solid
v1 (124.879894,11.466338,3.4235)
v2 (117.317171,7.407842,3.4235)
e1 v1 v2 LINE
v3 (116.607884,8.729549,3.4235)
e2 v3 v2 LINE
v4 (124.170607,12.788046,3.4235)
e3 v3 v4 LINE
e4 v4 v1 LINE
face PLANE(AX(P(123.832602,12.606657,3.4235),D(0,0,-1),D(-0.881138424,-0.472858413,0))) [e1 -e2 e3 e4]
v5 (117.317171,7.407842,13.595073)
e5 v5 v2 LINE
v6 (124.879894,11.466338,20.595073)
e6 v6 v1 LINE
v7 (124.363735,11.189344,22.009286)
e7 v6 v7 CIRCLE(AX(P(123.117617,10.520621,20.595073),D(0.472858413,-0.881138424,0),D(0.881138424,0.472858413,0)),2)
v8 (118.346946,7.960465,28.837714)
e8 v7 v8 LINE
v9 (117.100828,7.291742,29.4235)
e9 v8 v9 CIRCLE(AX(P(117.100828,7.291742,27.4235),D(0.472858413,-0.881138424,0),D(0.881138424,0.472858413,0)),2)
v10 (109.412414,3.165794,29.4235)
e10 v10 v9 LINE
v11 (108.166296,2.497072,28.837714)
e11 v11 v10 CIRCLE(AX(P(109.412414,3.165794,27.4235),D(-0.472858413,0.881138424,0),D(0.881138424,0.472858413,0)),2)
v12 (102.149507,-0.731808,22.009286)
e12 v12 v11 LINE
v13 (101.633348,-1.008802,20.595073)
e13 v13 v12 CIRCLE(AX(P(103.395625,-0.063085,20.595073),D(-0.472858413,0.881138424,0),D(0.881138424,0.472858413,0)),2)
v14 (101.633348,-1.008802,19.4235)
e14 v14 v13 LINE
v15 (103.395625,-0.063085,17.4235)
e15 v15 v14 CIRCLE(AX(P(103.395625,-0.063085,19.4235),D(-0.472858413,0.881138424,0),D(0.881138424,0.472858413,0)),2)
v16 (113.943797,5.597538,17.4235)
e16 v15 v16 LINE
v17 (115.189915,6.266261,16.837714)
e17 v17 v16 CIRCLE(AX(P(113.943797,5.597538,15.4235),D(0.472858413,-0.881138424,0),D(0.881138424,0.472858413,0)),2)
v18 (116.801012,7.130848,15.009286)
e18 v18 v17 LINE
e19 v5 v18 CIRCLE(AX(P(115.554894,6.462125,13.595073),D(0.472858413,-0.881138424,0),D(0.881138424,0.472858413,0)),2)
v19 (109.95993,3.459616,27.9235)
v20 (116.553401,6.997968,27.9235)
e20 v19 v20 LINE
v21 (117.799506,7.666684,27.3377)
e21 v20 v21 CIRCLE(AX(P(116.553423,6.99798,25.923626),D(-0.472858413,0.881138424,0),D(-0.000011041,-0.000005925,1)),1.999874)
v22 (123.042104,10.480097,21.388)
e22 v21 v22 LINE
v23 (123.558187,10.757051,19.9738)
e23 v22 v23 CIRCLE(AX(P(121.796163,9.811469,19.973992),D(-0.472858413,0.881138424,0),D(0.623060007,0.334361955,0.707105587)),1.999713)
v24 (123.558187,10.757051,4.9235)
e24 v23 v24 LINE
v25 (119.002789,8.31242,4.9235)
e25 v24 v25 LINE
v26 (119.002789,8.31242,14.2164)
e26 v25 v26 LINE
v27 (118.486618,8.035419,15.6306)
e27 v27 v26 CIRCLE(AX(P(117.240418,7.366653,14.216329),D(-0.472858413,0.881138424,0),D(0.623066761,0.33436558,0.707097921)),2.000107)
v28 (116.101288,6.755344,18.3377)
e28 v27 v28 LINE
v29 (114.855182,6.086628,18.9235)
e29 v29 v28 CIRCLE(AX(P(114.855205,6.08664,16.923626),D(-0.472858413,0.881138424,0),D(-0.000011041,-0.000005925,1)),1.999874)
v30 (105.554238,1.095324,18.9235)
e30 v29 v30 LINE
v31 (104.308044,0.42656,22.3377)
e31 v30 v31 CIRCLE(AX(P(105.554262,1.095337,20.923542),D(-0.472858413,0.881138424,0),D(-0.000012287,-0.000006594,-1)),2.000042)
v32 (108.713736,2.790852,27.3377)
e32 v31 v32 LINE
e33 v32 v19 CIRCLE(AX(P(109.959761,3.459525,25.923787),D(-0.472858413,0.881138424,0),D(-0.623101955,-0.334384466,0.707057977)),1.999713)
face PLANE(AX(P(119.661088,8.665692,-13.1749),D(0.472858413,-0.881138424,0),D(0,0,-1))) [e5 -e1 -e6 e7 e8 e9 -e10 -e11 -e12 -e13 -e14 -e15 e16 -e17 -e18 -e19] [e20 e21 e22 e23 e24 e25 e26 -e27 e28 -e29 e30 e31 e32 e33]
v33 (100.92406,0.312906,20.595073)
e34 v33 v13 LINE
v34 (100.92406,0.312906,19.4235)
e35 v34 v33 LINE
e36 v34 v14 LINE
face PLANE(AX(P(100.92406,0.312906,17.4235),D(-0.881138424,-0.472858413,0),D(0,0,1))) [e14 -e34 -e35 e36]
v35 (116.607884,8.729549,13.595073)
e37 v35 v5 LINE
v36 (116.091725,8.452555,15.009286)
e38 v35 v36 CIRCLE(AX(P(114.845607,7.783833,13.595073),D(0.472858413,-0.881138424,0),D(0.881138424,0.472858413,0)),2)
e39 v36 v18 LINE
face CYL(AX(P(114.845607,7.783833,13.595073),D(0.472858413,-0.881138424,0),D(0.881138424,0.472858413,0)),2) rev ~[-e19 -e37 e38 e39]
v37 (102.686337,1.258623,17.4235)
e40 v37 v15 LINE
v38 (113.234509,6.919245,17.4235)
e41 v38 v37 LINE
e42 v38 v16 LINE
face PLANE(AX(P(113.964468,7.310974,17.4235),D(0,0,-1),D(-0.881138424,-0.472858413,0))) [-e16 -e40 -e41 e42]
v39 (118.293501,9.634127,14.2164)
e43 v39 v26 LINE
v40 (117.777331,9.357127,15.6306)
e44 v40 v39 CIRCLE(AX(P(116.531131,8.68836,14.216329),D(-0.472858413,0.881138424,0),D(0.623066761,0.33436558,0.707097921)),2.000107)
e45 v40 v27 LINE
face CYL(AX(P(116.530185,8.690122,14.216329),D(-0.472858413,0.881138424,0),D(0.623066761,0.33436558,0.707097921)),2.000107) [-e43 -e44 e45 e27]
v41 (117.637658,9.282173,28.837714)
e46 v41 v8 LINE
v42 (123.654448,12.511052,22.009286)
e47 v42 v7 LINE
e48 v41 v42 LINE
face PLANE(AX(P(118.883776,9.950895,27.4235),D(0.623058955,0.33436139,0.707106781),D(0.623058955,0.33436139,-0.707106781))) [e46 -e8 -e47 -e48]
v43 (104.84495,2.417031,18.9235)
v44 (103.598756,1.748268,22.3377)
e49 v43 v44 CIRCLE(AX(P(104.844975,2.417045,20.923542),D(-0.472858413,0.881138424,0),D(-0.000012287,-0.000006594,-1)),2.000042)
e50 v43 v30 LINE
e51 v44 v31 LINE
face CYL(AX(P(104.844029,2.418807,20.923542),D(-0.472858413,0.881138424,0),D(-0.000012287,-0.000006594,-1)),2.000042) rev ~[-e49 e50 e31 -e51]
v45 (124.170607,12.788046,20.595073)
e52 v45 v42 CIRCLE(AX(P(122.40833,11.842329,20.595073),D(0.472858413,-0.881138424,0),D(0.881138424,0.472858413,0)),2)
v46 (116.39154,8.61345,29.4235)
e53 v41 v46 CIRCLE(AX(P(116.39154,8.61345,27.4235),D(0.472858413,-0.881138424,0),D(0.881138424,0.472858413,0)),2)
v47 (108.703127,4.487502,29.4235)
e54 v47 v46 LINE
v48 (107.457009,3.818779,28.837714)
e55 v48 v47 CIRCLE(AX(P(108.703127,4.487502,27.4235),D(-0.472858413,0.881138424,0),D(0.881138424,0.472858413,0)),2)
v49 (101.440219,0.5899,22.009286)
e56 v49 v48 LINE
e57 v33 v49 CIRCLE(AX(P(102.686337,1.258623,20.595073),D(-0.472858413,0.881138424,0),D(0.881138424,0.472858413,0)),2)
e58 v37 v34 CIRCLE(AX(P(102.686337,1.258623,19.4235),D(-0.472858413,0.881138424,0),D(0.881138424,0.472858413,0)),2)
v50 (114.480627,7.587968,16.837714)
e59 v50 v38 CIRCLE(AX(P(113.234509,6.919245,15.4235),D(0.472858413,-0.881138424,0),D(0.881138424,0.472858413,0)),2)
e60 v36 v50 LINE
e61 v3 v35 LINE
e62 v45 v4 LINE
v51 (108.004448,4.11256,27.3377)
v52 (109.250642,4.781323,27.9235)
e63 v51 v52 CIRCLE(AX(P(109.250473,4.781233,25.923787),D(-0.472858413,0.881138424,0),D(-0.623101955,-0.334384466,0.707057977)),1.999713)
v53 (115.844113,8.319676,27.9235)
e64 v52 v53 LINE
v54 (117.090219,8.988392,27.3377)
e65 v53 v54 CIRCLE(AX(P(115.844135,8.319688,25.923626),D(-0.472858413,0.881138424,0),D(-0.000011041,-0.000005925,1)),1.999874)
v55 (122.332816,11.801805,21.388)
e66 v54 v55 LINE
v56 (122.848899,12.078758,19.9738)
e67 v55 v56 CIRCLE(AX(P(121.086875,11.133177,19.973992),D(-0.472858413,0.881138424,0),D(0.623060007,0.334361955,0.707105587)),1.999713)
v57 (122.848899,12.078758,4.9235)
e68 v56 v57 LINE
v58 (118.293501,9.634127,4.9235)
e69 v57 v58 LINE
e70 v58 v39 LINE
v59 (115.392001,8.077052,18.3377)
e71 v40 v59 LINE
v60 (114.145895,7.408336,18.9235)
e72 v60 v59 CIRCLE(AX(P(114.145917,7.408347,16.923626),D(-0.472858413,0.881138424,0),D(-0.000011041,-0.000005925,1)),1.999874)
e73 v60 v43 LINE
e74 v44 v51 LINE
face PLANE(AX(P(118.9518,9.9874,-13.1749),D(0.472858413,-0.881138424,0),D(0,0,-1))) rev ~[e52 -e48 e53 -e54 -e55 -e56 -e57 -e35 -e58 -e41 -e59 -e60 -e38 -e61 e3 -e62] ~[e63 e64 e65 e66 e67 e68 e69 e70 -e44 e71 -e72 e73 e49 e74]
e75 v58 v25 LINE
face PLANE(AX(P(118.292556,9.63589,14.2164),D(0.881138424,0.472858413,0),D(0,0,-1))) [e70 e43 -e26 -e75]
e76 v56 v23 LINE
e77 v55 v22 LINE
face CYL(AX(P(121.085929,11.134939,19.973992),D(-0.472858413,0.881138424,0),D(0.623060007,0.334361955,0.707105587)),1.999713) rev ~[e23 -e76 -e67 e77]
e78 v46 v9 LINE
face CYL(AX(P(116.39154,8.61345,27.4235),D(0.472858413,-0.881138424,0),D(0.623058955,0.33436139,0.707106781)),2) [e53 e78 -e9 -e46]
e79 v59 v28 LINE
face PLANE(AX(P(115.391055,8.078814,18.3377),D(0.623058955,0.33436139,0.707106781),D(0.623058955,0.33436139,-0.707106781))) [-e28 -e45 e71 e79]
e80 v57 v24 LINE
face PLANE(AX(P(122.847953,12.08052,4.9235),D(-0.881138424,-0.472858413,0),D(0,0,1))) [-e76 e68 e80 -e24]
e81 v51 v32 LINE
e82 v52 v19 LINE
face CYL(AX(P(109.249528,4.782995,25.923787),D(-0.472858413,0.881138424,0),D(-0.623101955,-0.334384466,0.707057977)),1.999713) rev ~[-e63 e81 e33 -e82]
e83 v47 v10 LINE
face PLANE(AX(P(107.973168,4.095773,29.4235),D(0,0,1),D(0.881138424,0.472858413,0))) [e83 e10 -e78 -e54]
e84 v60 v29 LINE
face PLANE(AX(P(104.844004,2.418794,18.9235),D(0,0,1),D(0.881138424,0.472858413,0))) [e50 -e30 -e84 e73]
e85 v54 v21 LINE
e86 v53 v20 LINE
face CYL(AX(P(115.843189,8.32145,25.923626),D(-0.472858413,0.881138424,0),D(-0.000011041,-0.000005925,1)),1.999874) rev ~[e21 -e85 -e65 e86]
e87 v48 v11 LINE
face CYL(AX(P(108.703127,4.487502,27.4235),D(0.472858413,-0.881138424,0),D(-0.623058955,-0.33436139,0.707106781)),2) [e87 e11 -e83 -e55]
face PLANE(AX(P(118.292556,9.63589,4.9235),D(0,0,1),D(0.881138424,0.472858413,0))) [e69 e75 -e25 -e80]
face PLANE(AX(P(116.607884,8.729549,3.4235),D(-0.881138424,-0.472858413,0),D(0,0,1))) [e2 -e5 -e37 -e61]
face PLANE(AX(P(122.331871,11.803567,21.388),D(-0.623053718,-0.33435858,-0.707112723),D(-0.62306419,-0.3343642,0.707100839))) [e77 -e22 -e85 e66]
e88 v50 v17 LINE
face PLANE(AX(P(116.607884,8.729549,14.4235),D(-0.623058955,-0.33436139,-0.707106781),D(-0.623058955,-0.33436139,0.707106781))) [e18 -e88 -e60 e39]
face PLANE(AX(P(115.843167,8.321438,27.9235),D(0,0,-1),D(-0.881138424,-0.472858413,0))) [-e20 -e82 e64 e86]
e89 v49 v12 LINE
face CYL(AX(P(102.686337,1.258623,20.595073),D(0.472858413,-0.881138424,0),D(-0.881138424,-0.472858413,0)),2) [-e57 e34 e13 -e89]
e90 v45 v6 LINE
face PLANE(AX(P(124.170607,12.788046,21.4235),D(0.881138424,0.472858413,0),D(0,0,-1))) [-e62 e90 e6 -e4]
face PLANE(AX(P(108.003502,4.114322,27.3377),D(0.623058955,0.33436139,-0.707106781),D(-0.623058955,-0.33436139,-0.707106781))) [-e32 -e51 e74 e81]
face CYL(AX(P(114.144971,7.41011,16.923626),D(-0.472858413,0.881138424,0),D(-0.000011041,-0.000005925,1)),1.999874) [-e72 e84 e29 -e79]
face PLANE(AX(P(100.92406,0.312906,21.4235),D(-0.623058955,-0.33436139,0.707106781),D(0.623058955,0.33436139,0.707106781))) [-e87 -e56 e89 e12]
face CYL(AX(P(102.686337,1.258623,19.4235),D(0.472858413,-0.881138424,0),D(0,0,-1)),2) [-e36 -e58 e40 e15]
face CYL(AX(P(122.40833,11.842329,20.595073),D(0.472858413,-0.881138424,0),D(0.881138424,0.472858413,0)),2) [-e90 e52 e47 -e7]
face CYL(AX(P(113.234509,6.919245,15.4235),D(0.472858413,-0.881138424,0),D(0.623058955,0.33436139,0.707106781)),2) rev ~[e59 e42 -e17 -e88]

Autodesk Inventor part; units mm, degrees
ref_plane "YZ Plane" through (0, 0, 0) normal (1, 0, 0) x (0, 1, 0)
ref_plane "XZ Plane" through (0, 0, 0) normal (0, 1, 0) x (-1, 0, 0)
ref_plane "XY Plane" through (0, 0, 0) normal (0, 0, 1) x (1, 0, 0)
ref_plane "Work Plane1" through (118.9518, 9.9874, -13.1749) normal (0.4728584, -0.8811384, 0) x (0, 0, -1)
sketch "Sketch1" plane through (118.9518, 9.9874, -13.1749) normal (0.4728584, -0.8811384, 0) x (0, 0, -1)
  line L0 (-16.5984, 5.5392) -> (-16.5984, 5.9228)
  line L1 (-1.2281, -14.4596) -> (-31.7652, -14.4596) construction
  line L2 (-16.5984, 11.5008) -> (-16.5984, -0.9971) projected
  line L3 (-15.5984, -2) -> (-12.5984, -2)
  line L4 (-16.5984, 2) -> (-12.5984, 2)
  line L5 (-16.5984, -2.6601) -> (-27.5984, -2.6601)
  line L6 (-27.5984, -2.6601) -> (-30.5984, -5.6601)
  line L7 (-30.5984, -5.6601) -> (-30.5984, -8.4596)
  line L8 (-30.5984, -8.4596) -> (-30.5984, -20.4596)
  line L9 (-30.5984, -20.4596) -> (-34.5984, -20.4596)
  line L10 (-34.5984, -20.4596) -> (-42.5984, -12.4596)
  line L11 (-42.5984, -12.4596) -> (-42.5984, -2.0772)
  line L12 (-42.5984, -2.0772) -> (-34.5984, 5.9228)
  line L13 (-34.5984, 5.9228) -> (-16.5984, 5.9228)
  line L14 (-16.5984, 0.8574) -> (-16.5984, 5.9228)
  line L15 (-16.5984, 3.3399) -> (-48.439, 3.3399) construction
  line L16 (-16.5984, -0.9971) -> (-16.5984, -2.6601)
  line L17 (-16.5984, -0.0772) -> (-40.5984, -0.0772) construction
  line L18 (-40.5984, -0.0772) -> (-40.5984, -14.4596) construction
  line L19 (-16.5984, -0.0772) -> (-40.5984, -0.0772)
  line L20 (-19.5984, -2.6601) -> (-17.0984, -2.6601) projected
  point P0 (-13.1749, -109.5356)
  point P1 (-16.5984, 0.8574)
  dimension "d25" = 135
  dimension "d26" = 4
  dimension "d27" = 6
  dimension "d28" = 2.5829
  dimension "d29" = 6
  dimension "d31" = 12
  dimension "d40" = 3
  dimension "d42" = 26
  dimension "d45" = 0
  dimension "d50" = 8
  dimension "d62" = 0
extrude "Extrusion1" add sketch "Sketch1" along normal blind 1.5
sketch "Sketch2" plane through (119.6611, 8.6657, -13.1749) normal (0.4728584, -0.8811384, 0) x (0.8811384, 0.4728584, 0)
  line L0 (-2.0772, 42.5984) -> (-12.4596, 42.5984) projected
  line L1 (-12.4596, 42.5984) -> (-20.4596, 34.5984) projected
  line L2 (-20.4596, 34.5984) -> (-20.4596, 30.5984) projected
  line L3 (-20.4596, 30.5984) -> (-5.6601, 30.5984) projected
  line L4 (-5.6601, 30.5984) -> (-2.6601, 27.5984) projected
  line L5 (-2.6601, 27.5984) -> (-2.6601, 16.5984) projected
  line L6 (5.9228, 16.5984) -> (5.9228, 34.5984) projected
  line L7 (5.9228, 34.5984) -> (-2.0772, 42.5984) projected
  line L8 (-2.6601, 16.5984) -> (5.9228, 16.5984) projected
  line L9 (-11.8383, 41.0984) -> (-2.6985, 41.0984)
  line L10 (-2.6985, 41.0984) -> (4.4228, 33.9771)
  line L11 (4.4228, 33.9771) -> (4.4228, 18.0984)
  line L12 (4.4228, 18.0984) -> (-0.9902, 18.0984)
  line L13 (-0.9902, 18.0984) -> (-1.1601, 18.0962)
  line L14 (-1.1601, 18.0962) -> (-1.1601, 28.2197)
  line L15 (-1.1601, 28.2197) -> (-5.0388, 32.0984)
  line L16 (-5.0388, 32.0984) -> (-8.9884, 32.0984)
  line L17 (-8.9884, 32.0984) -> (-9.9596, 32.0984)
  line L18 (-9.9596, 32.0984) -> (-18.9596, 32.0984)
  line L19 (-18.9596, 32.0984) -> (-18.9596, 33.9771)
  line L20 (-18.9596, 33.9771) -> (-11.8383, 41.0984)
  point P0 (-109.5356, 13.1749)
  point P1 (-0.7471, 18.0984)
  dimension "d41" = 1.5
  dimension "d63" = 1.5
extrude "Extrusion2" [suppressed]
sketch "Sketch3" plane through (103.5006, 1.6956, 17.4235) normal (0, 0, -1) x (-0.8811384, -0.4728584, 0)
  circle A0 centre (-2.8052, -7.75) radius 4.5
  line L0 (3.1948, 0) -> (-8.8052, 0) projected
  line L1 (-8.8052, 0) -> (-8.8052, -15.5) projected
  line L2 (3.1948, -15.5) -> (-8.8052, -15.5) projected
  line L3 (3.1948, 0) -> (3.1948, -15.5) projected
  point P0 (92.0001, 47.4471)
extrude "Extrusion3" cut sketch "Sketch3" against normal blind 1.5 contours A0
sketch "Sketch8" plane through (119.7213, 8.698, 3.4235) normal (0, 0, 1) x (0.8811384, 0.4728584, 0)
  circle A0 centre (-19.1075, 3.6497) radius 1.4001 projected
  circle A1 centre (-14.1578, 7.8923) radius 2 projected
  circle A2 centre (-14.1578, 7.8923) radius 3.3708
  point P0 (-109.604, 48.9471)
extrude "Extrusion8" cut sketch "Sketch8" along normal mid plane 14 contours A1 | A2
sketch "Sketch9" plane through (118.7885, 8.1974, 4.9235) normal (0, 0, 1) x (0.8811384, 0.4728584, 0)
  circle A0 centre (0.9902, -6.25) radius 1.352 projected
  circle A1 centre (0.9902, -6.25) radius 2.6601
  point P0 (-108.5454, 48.9471)
extrude "Extrusion9" [suppressed]
ref_plane "Arbeitsebene3" through (124.1706, 12.788, 7.4235) normal (0, 0, -1) x (-0.8811384, -0.4728584, 0)
sketch "Skizze13" plane through (124.1706, 12.788, 7.4235) normal (0, 0, -1) x (-0.8811384, -0.4728584, 0)
  line L0 (0, 0) -> (0, -1.5) projected
  circle A0 centre (-2.8278, -9.3645) radius 1.1933 projected
  line L1 (8.5829, 0) -> (0, 0) projected
  line L2 (0, 0) -> (0, -15.5)
  line L3 (0, -15.5) -> (-6.5, -15.5)
  line L4 (-6.5, -15.5) -> (-6.5, 0)
  line L5 (-6.5, 0) -> (0, 0)
  circle A1 centre (-2.8278, -9.3645) radius 1.6 projected
  circle A2 centre (-2.8278, -9.3645) radius 1.75
  point P0 (115.4584, 47.4471)
  point P1 (-2.8531, -15.3156)
  dimension "d58" = 6.5
  dimension "d66" = 3.5
extrude "Extrusion13" [suppressed]
fillet "Rundung1" radius 2 7 edges at (124.5253, 12.1272, 21.4235) (108.3278, 3.4349, 29.4235) (101.2787, -0.348, 21.4235) (101.2787, -0.348, 17.4235) (114.3191, 6.6501, 17.4235) (116.9625, 8.0687, 14.4235) (117.4762, 8.3443, 29.4235)
sketch "Skizze14" plane through (118.9518, 9.9874, -13.1749) normal (-0.4728584, 0.8811384, 0) x (0.8811384, 0.4728584, 0)
  arc A0 (3.8371, -34.5629) -> (4.4228, -33.1487) centre (2.4228, -33.1487) ccw projected
  line L0 (3.8371, -34.5629) -> (-2.1127, -40.5126) projected
  arc A1 (-3.5269, -41.0984) -> (-2.1127, -40.5126) centre (-3.5269, -39.0984) ccw projected
  line L1 (-3.5269, -41.0984) -> (-11.0098, -41.0984) projected
  arc A2 (-12.4241, -40.5126) -> (-11.0098, -41.0984) centre (-11.0098, -39.0984) ccw projected
  line L2 (-12.4241, -40.5126) -> (-17.4241, -35.5126) projected
  arc A3 (-16.0098, -32.0984) -> (-17.4241, -35.5126) centre (-16.0098, -34.0984) ccw projected
  line L3 (-16.0098, -32.0984) -> (-5.4542, -32.0984) projected
  arc A4 (-5.4542, -32.0984) -> (-4.04, -31.5126) centre (-5.4542, -30.0984) ccw projected
  line L4 (-4.04, -31.5126) -> (-1.3329, -28.8055) projected
  arc A5 (-1.3329, -28.8055) -> (-0.7471, -27.3913) centre (-2.7471, -27.3913) ccw projected
  line L5 (-0.7471, -27.3913) -> (-0.7471, -18.0984) projected
  line L6 (-0.7471, -18.0984) -> (4.4228, -18.0984) projected
  line L7 (4.4228, -18.0984) -> (4.4228, -33.1487) projected
  point P0 (-109.5356, -13.1749)
extrude "Extrusion14" cut sketch "Skizze14" against normal blind 10
properties part number "Matchboxscope_Lightperiscope_long_V0"
